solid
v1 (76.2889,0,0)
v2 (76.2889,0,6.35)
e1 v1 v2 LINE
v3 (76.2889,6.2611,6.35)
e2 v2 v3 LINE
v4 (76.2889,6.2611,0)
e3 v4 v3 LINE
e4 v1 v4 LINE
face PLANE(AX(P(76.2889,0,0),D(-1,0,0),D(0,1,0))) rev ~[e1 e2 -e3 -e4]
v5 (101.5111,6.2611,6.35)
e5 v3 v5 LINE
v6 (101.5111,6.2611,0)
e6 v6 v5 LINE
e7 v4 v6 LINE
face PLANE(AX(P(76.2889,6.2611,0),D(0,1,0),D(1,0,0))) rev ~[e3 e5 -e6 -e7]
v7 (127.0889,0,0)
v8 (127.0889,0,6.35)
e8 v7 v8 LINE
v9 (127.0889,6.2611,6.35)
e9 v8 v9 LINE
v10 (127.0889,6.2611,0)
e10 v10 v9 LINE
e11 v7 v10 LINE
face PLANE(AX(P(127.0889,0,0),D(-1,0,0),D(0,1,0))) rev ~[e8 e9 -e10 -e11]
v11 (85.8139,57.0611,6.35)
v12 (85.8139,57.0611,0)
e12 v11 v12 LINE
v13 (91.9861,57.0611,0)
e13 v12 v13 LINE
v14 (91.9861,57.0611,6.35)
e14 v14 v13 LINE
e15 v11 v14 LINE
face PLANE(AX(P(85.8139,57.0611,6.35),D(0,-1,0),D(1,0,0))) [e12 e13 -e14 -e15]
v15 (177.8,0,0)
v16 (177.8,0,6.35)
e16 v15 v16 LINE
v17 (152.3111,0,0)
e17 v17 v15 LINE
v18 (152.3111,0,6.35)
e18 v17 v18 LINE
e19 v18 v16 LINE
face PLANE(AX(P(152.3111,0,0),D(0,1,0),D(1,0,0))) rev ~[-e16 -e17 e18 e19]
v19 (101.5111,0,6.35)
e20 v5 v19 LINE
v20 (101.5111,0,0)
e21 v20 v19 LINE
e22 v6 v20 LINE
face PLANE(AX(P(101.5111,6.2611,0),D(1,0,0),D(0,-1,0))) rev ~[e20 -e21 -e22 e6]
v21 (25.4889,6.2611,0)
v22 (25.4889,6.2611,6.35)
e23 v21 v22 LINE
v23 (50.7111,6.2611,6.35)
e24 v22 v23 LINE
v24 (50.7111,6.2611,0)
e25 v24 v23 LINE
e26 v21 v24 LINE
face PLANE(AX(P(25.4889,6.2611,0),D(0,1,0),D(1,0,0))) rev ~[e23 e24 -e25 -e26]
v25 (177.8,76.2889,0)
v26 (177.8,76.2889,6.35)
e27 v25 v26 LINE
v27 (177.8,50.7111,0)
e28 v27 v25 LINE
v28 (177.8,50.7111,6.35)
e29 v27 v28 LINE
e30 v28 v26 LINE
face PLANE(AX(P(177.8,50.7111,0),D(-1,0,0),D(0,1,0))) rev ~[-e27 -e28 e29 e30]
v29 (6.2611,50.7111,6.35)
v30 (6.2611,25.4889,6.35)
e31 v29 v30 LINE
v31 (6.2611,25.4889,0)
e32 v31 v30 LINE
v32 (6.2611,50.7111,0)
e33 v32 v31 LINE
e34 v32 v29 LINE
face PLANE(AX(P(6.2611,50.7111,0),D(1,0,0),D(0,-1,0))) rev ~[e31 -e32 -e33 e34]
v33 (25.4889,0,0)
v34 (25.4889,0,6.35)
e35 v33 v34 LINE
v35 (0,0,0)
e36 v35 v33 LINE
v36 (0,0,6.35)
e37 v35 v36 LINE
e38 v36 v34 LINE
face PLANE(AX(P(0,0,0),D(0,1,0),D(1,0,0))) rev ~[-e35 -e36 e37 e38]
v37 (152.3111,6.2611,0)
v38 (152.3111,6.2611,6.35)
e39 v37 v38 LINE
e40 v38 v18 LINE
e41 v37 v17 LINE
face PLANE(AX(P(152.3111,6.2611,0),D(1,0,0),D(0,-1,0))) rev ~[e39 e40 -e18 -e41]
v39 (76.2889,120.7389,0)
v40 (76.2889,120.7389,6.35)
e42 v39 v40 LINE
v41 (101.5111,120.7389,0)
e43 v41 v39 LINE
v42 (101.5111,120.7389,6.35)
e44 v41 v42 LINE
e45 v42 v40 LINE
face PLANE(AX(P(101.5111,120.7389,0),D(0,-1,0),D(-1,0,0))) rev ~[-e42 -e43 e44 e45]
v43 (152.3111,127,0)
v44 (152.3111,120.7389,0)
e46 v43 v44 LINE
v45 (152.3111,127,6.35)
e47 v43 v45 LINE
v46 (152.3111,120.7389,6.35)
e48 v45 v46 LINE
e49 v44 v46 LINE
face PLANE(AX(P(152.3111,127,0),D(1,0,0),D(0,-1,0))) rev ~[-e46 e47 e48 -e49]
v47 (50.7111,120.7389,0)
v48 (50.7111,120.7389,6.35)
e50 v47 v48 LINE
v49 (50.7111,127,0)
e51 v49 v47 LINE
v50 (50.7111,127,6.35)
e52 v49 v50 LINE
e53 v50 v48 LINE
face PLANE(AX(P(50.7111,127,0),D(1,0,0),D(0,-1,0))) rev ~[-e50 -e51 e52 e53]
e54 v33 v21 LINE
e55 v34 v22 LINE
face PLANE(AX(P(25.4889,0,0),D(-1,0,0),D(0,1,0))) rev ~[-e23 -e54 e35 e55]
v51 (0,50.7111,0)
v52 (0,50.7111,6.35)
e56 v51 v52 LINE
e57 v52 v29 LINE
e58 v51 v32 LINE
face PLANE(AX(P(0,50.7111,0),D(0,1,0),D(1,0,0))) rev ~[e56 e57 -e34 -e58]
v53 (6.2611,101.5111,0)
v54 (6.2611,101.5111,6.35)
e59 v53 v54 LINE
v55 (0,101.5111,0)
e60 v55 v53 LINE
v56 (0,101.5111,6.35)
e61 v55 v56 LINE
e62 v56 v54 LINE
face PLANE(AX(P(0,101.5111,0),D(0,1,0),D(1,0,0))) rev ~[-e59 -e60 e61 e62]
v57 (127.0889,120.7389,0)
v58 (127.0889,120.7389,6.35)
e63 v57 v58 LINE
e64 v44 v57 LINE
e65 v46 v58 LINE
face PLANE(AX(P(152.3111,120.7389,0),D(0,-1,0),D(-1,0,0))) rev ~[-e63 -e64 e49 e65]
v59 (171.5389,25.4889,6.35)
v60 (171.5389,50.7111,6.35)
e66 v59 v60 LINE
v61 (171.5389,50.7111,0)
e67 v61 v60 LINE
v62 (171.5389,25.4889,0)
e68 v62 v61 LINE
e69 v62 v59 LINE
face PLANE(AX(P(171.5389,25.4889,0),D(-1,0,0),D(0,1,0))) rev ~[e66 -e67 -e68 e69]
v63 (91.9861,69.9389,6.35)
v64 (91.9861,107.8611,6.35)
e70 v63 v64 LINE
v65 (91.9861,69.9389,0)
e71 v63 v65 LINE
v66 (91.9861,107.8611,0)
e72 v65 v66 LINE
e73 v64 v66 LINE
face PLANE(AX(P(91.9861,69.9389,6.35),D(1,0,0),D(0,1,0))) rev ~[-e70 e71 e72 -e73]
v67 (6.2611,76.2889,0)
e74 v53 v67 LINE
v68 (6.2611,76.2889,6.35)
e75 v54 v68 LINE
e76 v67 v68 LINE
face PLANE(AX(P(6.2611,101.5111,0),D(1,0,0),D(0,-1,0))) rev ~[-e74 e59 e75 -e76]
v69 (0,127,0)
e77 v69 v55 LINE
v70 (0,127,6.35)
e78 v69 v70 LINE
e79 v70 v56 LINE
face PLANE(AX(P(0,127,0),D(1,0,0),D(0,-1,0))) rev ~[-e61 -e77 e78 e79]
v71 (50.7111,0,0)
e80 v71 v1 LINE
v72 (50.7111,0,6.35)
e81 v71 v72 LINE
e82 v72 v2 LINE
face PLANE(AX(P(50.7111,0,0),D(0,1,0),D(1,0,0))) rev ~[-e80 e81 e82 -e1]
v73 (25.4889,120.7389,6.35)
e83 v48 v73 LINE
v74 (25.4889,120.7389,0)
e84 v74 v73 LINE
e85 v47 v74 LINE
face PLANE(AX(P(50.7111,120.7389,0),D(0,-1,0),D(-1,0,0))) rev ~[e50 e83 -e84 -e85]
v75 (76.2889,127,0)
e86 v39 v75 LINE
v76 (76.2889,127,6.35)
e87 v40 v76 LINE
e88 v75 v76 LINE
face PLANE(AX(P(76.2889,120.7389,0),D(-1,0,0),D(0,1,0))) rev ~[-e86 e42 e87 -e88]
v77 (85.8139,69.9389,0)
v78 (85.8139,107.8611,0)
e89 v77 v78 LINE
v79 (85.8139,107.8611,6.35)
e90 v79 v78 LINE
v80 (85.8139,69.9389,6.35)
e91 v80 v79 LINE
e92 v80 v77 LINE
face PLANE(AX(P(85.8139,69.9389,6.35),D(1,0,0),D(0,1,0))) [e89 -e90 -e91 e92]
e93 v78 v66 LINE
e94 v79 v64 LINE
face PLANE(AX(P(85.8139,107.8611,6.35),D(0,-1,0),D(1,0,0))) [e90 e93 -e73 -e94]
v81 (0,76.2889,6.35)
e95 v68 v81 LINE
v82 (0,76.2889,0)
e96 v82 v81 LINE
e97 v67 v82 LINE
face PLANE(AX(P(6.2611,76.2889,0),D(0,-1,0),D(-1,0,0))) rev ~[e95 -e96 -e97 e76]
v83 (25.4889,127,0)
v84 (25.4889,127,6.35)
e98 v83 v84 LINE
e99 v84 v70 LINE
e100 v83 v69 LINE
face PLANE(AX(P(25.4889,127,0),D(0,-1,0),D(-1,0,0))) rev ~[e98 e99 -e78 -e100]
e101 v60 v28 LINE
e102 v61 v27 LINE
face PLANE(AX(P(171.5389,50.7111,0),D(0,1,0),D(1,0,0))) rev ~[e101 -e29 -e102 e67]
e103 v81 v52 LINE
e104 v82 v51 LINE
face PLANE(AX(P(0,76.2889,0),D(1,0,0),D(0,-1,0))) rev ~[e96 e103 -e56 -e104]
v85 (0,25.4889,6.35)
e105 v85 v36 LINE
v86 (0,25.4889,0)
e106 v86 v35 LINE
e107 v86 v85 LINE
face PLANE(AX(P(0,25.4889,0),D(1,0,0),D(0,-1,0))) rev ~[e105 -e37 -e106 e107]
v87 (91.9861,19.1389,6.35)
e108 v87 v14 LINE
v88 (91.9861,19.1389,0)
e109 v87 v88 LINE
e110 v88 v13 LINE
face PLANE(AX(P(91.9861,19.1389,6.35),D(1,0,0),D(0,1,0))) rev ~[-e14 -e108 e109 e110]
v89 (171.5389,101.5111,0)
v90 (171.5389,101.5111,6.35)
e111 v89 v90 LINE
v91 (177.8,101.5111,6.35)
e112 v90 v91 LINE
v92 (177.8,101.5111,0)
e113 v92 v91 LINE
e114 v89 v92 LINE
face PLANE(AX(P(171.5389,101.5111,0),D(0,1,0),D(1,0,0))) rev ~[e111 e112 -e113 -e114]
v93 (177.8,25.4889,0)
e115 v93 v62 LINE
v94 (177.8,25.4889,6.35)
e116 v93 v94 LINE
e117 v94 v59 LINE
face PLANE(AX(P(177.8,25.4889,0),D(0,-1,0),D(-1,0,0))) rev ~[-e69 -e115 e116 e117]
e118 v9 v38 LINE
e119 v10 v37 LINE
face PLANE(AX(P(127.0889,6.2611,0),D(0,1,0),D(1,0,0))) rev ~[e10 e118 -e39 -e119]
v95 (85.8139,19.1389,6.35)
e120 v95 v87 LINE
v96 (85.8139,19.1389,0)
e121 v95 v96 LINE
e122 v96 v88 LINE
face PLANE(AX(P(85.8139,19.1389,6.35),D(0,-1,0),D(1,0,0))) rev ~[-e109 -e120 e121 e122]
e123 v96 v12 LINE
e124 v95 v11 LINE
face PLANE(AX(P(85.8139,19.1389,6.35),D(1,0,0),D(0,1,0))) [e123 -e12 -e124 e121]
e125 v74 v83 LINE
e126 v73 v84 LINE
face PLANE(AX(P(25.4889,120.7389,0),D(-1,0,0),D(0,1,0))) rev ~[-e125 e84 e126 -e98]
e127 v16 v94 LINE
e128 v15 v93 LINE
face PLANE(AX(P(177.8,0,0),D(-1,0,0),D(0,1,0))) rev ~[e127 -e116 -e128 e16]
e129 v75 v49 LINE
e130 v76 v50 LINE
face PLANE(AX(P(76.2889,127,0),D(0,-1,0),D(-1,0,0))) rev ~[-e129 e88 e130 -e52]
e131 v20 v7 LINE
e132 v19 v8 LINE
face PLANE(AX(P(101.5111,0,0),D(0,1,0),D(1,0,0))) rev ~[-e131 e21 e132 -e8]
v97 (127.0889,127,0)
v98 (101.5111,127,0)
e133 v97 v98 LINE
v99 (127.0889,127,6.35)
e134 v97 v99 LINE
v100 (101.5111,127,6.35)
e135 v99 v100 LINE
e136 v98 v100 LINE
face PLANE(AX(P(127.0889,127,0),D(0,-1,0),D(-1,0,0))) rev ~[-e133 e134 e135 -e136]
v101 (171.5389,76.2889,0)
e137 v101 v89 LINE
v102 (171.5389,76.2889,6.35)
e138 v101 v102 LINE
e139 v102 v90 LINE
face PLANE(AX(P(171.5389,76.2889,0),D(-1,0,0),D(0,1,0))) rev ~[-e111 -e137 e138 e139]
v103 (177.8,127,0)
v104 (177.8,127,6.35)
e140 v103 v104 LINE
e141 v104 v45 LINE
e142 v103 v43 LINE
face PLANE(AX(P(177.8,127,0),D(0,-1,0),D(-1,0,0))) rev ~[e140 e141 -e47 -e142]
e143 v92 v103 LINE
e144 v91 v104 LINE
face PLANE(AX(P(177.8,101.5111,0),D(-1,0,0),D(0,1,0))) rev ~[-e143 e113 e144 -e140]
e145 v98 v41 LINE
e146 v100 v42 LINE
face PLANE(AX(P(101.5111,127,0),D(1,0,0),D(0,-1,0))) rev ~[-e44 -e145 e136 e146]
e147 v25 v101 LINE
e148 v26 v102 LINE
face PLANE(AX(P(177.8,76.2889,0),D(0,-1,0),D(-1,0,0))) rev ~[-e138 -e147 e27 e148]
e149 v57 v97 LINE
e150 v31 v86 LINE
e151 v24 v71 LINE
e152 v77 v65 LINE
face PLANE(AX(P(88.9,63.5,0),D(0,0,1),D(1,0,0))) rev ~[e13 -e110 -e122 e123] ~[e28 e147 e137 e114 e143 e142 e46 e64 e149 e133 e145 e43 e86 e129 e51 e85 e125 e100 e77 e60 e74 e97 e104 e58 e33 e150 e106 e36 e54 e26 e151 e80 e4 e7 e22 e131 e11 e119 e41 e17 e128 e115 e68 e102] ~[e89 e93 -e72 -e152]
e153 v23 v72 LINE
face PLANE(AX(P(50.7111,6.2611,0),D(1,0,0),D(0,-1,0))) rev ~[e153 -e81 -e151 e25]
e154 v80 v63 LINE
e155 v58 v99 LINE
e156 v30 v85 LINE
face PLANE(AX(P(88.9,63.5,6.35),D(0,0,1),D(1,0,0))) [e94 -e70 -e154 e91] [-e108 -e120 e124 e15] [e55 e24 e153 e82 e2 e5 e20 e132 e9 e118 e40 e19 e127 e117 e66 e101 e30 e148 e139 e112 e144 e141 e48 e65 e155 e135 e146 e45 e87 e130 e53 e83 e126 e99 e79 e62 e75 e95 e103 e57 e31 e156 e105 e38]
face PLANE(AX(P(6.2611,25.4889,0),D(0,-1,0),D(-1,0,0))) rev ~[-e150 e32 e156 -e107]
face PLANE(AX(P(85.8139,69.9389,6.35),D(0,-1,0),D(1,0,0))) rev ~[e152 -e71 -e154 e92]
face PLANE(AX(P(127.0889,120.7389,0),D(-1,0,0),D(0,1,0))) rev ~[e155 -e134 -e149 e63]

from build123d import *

# Parameters (mm, degrees)
F1_DEPTH = 6.35
F2_W     = 6.1722
F2_H     = 37.9222
F3_DEPTH = 6.351


# Not quite as in the source:
# - a length typed as a fraction of an inch, garbled in the dataset ("3 / 203.2 mm" for 3/8 in), is restored


with BuildPart() as f1:
    # F0 (on Top) → F1 (new body)
    with BuildSketch(Plane.XY):
        Polygon((0, 25.4889), (0, 0), (25.4889, 0), (25.4889, 6.2611), (50.7111, 6.2611), (50.7111, 0), (76.2889, 0), (76.2889, 6.2611), (101.5111, 6.2611), (101.5111, 0), (127.0889, 0), (127.0889, 6.2611), (152.3111, 6.2611), (152.3111, 0), (177.8, 0), (177.8, 25.4889), (171.5389, 25.4889), (171.5389, 50.7111), (177.8, 50.7111), (177.8, 76.2889), (171.5389, 76.2889), (171.5389, 101.5111), (177.8, 101.5111), (177.8, 127), (152.3111, 127), (152.3111, 120.7389), (127.0889, 120.7389), (127.0889, 127), (101.5111, 127), (101.5111, 120.7389), (76.2889, 120.7389), (76.2889, 127), (50.7111, 127), (50.7111, 120.7389), (25.4889, 120.7389), (25.4889, 127), (0, 127), (0, 101.5111), (6.2611, 101.5111), (6.2611, 76.2889), (0, 76.2889), (0, 50.7111), (6.2611, 50.7111), (6.2611, 25.4889), align=None)
    extrude(amount=F1_DEPTH)

    # F2 (on face) → F3 (cut, through all)
    with BuildSketch(Plane.XY.offset(6.35)):
        with Locations((88.9, 88.9)):
            Rectangle(F2_W, F2_H)
        with Locations((88.9, 38.1)):
            Rectangle(F2_W, F2_H)
    extrude(amount=-F3_DEPTH, mode=Mode.SUBTRACT)


solid = f1.part
